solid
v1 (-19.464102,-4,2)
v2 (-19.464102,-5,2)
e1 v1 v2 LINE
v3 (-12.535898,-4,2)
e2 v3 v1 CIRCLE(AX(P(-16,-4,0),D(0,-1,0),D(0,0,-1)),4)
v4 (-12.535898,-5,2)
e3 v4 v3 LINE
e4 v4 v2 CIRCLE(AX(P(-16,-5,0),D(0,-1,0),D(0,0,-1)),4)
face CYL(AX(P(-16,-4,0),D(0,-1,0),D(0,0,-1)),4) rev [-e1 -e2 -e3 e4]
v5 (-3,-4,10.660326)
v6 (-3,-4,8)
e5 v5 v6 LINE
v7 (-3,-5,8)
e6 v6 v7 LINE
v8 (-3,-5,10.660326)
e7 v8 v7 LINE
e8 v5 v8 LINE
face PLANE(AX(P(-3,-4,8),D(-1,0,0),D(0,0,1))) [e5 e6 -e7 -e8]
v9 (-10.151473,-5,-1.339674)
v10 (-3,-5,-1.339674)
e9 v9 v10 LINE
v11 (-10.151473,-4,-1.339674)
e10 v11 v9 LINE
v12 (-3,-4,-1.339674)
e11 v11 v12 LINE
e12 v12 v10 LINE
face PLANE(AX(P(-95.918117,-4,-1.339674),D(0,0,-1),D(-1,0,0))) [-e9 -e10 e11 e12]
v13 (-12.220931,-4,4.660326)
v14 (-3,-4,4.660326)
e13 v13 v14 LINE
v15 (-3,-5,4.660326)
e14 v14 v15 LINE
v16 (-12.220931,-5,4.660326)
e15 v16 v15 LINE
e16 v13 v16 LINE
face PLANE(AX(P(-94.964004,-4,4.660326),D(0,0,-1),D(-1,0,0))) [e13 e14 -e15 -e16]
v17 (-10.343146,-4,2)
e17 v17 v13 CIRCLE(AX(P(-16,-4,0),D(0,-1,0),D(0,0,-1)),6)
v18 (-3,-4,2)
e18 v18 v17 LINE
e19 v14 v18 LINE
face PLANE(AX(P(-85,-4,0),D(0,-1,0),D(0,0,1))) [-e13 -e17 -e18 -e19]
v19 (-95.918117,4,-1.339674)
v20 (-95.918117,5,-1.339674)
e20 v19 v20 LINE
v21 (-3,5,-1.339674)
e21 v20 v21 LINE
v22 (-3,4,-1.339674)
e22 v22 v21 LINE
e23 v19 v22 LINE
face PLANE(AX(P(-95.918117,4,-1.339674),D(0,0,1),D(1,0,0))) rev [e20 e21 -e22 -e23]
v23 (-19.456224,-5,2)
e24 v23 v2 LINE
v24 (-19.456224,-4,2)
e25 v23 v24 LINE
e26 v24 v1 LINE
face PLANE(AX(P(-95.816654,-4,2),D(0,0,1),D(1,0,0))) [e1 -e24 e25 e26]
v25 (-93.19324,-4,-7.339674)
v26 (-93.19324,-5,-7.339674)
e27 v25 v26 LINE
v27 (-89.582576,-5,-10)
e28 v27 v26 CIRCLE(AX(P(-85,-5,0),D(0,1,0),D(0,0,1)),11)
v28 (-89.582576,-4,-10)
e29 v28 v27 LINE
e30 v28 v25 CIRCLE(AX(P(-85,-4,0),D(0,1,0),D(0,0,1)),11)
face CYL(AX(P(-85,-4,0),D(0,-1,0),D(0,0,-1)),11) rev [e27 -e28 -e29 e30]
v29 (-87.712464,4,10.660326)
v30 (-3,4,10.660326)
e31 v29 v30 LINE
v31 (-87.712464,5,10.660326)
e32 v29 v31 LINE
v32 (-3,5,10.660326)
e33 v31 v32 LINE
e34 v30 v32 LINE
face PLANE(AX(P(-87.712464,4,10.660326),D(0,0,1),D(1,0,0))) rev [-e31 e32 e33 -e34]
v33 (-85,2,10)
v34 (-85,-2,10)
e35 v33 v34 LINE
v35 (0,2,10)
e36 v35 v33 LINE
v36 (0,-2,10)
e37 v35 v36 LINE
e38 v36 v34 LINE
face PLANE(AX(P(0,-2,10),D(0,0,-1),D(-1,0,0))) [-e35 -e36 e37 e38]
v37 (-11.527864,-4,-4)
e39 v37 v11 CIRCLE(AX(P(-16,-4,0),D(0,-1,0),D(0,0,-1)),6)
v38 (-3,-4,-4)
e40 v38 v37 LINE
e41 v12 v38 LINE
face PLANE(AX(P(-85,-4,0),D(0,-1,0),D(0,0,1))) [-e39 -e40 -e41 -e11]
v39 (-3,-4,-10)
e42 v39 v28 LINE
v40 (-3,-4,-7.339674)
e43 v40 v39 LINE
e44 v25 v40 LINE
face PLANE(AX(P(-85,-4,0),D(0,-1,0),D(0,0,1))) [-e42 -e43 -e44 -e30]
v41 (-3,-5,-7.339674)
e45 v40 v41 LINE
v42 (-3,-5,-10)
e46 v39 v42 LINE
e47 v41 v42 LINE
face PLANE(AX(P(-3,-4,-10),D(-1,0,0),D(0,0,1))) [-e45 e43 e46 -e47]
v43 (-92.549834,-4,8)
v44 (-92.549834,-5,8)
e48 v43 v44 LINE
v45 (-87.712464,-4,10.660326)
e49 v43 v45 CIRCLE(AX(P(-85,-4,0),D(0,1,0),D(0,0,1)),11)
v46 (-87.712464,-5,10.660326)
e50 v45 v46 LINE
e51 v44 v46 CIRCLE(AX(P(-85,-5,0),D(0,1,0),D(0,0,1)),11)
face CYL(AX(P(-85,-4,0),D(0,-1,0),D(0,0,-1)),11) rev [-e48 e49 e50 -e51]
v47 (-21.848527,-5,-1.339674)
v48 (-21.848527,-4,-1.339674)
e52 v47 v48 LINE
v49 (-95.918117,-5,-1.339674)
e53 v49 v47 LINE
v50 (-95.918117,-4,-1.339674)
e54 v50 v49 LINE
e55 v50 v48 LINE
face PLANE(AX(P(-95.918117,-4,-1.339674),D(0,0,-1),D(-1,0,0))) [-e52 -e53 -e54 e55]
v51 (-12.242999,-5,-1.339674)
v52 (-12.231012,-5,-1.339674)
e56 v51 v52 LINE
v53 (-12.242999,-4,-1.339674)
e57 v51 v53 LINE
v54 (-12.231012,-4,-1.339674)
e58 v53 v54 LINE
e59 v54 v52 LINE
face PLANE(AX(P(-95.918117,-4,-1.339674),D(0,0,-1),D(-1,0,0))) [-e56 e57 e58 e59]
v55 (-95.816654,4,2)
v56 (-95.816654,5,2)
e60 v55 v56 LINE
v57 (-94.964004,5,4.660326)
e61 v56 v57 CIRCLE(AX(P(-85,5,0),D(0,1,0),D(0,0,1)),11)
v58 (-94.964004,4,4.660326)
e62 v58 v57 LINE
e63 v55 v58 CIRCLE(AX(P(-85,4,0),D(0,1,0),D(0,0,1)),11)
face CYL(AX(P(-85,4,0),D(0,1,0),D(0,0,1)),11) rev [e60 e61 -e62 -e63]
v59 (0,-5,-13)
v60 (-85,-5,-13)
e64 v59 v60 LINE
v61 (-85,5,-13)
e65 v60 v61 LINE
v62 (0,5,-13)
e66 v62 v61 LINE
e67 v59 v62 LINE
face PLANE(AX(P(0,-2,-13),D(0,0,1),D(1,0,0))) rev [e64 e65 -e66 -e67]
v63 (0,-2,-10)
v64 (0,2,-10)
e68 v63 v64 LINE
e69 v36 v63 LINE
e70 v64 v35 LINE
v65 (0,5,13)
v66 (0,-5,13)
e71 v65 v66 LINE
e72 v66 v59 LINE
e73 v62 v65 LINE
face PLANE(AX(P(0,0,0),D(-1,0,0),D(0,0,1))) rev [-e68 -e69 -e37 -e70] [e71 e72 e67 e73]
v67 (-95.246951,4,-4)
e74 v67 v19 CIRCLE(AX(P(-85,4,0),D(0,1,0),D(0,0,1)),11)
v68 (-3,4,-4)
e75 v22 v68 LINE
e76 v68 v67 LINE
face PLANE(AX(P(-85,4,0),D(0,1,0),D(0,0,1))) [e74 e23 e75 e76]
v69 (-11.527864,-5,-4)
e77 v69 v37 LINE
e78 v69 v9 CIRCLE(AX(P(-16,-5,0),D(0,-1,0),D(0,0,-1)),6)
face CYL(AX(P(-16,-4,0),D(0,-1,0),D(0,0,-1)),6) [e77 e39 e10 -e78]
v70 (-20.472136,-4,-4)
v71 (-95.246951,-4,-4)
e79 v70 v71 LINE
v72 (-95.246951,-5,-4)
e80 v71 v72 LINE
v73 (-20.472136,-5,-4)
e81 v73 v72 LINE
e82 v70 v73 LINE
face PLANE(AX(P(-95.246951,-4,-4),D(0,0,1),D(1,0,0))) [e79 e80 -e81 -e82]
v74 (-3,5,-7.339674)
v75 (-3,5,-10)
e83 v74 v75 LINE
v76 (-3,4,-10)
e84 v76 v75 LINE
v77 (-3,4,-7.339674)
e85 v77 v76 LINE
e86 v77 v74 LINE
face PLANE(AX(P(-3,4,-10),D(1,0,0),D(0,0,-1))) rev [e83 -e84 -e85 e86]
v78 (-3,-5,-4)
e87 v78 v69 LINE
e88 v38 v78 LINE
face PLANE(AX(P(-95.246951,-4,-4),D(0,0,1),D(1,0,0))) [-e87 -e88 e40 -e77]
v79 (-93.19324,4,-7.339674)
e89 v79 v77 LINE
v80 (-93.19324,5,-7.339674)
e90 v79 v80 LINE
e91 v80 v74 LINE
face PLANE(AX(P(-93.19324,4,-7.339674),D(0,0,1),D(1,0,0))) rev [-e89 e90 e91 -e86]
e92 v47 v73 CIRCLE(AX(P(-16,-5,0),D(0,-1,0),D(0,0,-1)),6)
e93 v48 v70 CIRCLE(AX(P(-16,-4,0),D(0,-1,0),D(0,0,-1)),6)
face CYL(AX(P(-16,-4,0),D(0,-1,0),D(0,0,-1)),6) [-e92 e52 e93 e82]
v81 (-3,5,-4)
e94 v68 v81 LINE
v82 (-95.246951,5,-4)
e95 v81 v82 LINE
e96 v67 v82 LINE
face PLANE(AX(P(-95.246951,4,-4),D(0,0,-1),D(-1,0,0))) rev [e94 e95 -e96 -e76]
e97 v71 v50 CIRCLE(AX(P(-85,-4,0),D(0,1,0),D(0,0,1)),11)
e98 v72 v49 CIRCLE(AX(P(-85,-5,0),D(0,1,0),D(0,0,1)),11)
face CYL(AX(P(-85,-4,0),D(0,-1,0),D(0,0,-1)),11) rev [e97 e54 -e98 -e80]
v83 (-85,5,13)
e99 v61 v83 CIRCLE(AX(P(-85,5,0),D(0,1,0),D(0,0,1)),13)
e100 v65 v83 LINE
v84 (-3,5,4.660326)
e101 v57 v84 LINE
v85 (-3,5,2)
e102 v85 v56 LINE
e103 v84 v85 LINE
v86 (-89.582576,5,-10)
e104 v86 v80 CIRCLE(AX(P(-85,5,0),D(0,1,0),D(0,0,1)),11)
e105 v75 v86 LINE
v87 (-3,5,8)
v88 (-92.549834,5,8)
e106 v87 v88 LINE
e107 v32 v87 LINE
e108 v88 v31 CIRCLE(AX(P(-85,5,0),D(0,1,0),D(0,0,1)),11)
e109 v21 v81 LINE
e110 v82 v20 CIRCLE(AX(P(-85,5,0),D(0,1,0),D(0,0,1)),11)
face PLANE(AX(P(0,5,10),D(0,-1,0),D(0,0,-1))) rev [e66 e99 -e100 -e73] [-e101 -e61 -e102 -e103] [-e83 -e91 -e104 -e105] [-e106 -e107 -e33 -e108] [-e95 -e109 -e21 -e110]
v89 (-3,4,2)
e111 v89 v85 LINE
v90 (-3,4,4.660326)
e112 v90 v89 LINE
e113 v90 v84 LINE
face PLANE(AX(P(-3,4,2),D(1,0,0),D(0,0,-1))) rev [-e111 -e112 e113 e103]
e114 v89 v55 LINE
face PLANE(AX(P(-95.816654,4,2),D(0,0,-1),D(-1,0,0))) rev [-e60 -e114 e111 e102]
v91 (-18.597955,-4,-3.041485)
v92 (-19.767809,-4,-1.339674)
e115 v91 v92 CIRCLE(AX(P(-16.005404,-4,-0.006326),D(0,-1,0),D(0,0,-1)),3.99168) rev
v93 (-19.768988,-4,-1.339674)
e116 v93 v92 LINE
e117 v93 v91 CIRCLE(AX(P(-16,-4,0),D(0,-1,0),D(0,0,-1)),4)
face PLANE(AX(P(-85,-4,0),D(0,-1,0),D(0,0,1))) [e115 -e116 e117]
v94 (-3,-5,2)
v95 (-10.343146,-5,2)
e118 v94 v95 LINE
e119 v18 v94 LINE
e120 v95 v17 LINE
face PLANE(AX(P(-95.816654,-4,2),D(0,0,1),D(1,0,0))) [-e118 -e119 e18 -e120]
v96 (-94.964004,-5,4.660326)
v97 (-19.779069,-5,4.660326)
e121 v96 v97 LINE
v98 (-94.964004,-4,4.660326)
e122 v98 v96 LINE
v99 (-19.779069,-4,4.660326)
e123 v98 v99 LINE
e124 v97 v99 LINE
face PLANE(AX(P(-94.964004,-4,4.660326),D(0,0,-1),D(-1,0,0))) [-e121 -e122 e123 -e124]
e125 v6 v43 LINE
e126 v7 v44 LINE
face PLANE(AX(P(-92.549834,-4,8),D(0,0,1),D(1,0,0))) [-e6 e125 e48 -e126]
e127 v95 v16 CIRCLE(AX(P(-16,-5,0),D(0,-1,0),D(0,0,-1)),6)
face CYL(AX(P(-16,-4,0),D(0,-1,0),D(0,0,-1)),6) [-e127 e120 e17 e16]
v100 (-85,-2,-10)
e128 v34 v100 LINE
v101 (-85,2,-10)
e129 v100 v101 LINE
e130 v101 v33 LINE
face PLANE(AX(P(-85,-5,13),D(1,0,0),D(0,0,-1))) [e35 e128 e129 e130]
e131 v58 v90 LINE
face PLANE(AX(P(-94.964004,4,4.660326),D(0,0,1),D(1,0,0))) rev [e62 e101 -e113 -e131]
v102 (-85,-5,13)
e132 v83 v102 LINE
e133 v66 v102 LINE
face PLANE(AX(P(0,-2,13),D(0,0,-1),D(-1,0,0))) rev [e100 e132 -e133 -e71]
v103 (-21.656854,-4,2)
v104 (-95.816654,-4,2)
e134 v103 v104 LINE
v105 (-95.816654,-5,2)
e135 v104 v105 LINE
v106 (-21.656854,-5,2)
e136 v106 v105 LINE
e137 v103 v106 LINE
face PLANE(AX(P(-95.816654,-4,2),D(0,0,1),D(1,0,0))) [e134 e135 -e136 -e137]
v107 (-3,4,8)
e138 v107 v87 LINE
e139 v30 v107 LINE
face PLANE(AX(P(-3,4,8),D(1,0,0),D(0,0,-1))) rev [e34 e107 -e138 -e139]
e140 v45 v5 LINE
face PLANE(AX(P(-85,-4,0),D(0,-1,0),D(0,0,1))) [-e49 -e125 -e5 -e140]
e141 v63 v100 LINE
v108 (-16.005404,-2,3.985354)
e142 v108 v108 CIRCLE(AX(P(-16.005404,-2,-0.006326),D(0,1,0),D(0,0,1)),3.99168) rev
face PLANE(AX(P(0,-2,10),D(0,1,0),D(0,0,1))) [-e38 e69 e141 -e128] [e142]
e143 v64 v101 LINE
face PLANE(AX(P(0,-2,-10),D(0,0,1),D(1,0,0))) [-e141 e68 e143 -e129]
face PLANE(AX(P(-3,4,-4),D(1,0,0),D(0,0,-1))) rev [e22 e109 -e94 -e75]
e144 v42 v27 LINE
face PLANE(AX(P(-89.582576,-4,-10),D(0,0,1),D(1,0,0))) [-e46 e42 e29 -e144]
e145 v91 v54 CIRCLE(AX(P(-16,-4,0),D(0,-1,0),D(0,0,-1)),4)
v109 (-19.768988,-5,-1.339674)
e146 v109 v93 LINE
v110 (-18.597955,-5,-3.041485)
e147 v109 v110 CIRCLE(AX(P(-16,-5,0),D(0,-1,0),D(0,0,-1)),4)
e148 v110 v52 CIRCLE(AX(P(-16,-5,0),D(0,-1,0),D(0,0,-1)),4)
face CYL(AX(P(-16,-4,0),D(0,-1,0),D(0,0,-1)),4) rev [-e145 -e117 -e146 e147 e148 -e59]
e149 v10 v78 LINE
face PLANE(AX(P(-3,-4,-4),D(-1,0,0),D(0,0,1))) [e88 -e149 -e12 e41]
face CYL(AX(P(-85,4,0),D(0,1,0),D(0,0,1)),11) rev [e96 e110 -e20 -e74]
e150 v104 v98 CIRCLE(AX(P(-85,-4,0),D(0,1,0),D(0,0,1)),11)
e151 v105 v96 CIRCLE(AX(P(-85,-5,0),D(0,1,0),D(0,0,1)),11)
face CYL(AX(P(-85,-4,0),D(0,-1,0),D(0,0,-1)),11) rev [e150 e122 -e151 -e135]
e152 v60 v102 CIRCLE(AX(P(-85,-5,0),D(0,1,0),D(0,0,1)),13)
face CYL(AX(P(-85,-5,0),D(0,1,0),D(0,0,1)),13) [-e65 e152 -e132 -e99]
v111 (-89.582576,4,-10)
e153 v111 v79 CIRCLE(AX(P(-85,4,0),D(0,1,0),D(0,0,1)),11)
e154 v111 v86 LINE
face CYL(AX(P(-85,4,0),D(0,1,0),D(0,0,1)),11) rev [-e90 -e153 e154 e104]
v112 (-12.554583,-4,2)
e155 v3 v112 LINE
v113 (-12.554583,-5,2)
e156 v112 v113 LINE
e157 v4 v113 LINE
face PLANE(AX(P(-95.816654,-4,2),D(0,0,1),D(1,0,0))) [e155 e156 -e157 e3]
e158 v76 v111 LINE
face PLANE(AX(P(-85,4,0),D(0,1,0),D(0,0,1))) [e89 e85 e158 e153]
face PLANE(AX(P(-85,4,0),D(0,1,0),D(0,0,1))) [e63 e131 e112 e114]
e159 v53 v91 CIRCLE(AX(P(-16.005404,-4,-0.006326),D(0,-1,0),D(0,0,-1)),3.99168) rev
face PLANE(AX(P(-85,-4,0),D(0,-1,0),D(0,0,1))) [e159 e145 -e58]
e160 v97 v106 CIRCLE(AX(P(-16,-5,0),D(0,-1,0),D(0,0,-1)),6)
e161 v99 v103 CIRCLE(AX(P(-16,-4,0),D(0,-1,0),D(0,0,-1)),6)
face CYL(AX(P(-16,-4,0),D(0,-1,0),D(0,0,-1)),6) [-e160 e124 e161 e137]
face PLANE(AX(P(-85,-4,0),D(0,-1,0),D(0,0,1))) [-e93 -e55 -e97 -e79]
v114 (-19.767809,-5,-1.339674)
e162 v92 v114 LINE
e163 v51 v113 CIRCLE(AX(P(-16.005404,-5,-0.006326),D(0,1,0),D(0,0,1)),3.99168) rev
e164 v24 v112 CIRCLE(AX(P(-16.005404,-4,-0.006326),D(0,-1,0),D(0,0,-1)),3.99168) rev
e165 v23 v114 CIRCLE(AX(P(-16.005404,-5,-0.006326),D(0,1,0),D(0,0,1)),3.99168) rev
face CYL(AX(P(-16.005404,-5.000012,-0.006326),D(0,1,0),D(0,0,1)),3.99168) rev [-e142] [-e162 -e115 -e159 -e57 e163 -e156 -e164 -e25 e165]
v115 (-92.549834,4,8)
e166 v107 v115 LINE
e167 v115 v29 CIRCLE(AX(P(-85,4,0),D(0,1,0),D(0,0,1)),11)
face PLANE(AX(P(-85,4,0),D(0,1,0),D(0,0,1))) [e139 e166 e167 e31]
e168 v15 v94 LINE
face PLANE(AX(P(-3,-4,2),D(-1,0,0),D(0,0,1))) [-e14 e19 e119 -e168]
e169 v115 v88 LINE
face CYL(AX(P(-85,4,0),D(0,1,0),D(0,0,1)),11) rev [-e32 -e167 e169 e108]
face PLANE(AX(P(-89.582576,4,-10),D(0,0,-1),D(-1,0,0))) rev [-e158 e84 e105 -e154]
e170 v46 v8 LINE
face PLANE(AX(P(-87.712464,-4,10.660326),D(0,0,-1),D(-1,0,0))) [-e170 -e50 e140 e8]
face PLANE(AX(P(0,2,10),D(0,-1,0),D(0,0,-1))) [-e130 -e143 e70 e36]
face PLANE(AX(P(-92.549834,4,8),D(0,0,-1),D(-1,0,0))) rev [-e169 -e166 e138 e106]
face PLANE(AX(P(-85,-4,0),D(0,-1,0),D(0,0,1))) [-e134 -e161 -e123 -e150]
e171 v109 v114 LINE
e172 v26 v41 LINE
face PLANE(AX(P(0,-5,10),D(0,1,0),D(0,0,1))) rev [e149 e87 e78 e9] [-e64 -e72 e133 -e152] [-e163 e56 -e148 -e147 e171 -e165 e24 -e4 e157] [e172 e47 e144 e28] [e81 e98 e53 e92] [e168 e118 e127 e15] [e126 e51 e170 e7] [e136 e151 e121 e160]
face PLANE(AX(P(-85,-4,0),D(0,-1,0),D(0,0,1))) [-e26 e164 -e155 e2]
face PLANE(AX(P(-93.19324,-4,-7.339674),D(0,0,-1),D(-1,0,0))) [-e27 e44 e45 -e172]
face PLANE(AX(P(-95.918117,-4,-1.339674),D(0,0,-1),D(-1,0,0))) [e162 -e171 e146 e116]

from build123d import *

# Parameters (mm, degrees)
SWEEP_THIN1_START              = -85
SWEEP_THIN1_OUTLINE_W          = 10
SWEEP_THIN1_OUTLINE_H          = 26
SWEEP_THIN1_OUTLINE_W_2        = 4
SWEEP_THIN1_OUTLINE_H_2        = 20
SWEEP_THIN1_DEPTH              = 85
BOSS_EXTRUDE1_DEPTH            = 10
CUT_EXTRUDE1_DEPTH             = 1
SKETCH7_R                      = 6
SKETCH7_R_2                    = 4
BOSS_EXTRUDE2_DEPTH            = 1
CUT_EXTRUDE2_REACH             = 101.363
SKETCH8_R                      = 3.991679888
CUT_EXTRUDE2_DIRECTION_2_DEPTH = 100.36297097


# Read off the part's stored shape, not the designer's step: Sweep-Thin1
with BuildPart() as part:
    # Sweep-Thin1 outline → Sweep-Thin1 (new body)
    with BuildSketch(Plane.YZ.offset(SWEEP_THIN1_START)):
        Rectangle(SWEEP_THIN1_OUTLINE_W, SWEEP_THIN1_OUTLINE_H)
        Rectangle(SWEEP_THIN1_OUTLINE_W_2, SWEEP_THIN1_OUTLINE_H_2, mode=Mode.SUBTRACT)
    extrude(amount=SWEEP_THIN1_DEPTH)

    # Sketch5 → Boss-Extrude1 (add)
    with BuildSketch(Plane(origin=(0, 5, 0), x_dir=(1, 0, 0), z_dir=(0, 1, 0))):
        with BuildLine():
            Line((-85, -13), (-85, 13))
            ThreePointArc((-85, 13), (-98, 0), (-85, -13))
        make_face()
    extrude(amount=-BOSS_EXTRUDE1_DEPTH)

    # Sketch6 → Cut-Extrude1 (cut)
    with BuildSketch(Plane(origin=(0, 5, 0), x_dir=(1, 0, 0), z_dir=(0, 1, 0))):
        with BuildLine():
            Line((-89.582575695, 10), (-3, 10))
            Line((-3, 10), (-3, 7.339674458))
            Line((-3, 7.339674458), (-93.193239827, 7.339674458))
            ThreePointArc((-93.193239827, 7.339674458), (-91.524929008, 8.855806086), (-89.582575695, 10))
        make_face()
        with BuildLine():
            Line((-95.246950766, 4), (-3, 4))
            Line((-3, 4), (-3, 1.339674458))
            Line((-3, 1.339674458), (-95.918116703, 1.339674458))
            ThreePointArc((-95.918116703, 1.339674458), (-95.665802982, 2.690844989), (-95.246950766, 4))
        make_face()
        with BuildLine():
            Line((-95.816653826, -2), (-3, -2))
            Line((-3, -2), (-3, -4.660325542))
            Line((-3, -4.660325542), (-94.964003505, -4.660325542))
            ThreePointArc((-94.964003505, -4.660325542), (-95.475125907, -3.357340797), (-95.816653826, -2))
        make_face()
        with BuildLine():
            Line((-92.549834435, -8), (-3, -8))
            Line((-3, -8), (-3, -10.660325542))
            Line((-3, -10.660325542), (-87.712463701, -10.660325542))
            ThreePointArc((-87.712463701, -10.660325542), (-90.300756904, -9.638567126), (-92.549834435, -8))
        make_face()
    cut_extrude1 = extrude(amount=-CUT_EXTRUDE1_DEPTH, mode=Mode.SUBTRACT)

    # Mirror1: Cut-Extrude1 across plane
    add(cut_extrude1.mirror(Plane.ZX), mode=Mode.SUBTRACT)

    # Sketch7 → Boss-Extrude2 (add)
    with BuildSketch(Plane.XZ.offset(5)):
        with Locations((-16, 0)):
            Circle(SKETCH7_R)
        with Locations((-16, 0)):
            Circle(SKETCH7_R_2, mode=Mode.SUBTRACT)
    extrude(amount=-BOSS_EXTRUDE2_DEPTH)

    # Sketch8 → Cut-Extrude2 (cut, up to next)
    with BuildSketch(Plane(origin=(0, -5, 0), x_dir=(-1, 0, 0), z_dir=(0, -1, 0)), mode=Mode.PRIVATE) as cut_extrude2_sk1:
        with Locations(Location((16.005403819, 0.006326373, 0), (0, 0, 270))):
            Circle(SKETCH8_R)
    cut_extrude2_tool1 = extrude(cut_extrude2_sk1.sketch, amount=-CUT_EXTRUDE2_REACH, mode=Mode.PRIVATE) & part.part
    add(cut_extrude2_tool1.solids().sort_by_distance((-16.005404, -5, -0.006326))[0], mode=Mode.SUBTRACT)

    # Sketch8 → Cut-Extrude2 direction 2 (cut)
    with BuildSketch(Plane(origin=(0, -5, 0), x_dir=(-1, 0, 0), z_dir=(0, -1, 0))):
        with Locations(Location((16.005403819, 0.006326373, 0), (0, 0, 270))):
            Circle(SKETCH8_R)
    extrude(amount=CUT_EXTRUDE2_DIRECTION_2_DEPTH, mode=Mode.SUBTRACT)


solid = part.part
